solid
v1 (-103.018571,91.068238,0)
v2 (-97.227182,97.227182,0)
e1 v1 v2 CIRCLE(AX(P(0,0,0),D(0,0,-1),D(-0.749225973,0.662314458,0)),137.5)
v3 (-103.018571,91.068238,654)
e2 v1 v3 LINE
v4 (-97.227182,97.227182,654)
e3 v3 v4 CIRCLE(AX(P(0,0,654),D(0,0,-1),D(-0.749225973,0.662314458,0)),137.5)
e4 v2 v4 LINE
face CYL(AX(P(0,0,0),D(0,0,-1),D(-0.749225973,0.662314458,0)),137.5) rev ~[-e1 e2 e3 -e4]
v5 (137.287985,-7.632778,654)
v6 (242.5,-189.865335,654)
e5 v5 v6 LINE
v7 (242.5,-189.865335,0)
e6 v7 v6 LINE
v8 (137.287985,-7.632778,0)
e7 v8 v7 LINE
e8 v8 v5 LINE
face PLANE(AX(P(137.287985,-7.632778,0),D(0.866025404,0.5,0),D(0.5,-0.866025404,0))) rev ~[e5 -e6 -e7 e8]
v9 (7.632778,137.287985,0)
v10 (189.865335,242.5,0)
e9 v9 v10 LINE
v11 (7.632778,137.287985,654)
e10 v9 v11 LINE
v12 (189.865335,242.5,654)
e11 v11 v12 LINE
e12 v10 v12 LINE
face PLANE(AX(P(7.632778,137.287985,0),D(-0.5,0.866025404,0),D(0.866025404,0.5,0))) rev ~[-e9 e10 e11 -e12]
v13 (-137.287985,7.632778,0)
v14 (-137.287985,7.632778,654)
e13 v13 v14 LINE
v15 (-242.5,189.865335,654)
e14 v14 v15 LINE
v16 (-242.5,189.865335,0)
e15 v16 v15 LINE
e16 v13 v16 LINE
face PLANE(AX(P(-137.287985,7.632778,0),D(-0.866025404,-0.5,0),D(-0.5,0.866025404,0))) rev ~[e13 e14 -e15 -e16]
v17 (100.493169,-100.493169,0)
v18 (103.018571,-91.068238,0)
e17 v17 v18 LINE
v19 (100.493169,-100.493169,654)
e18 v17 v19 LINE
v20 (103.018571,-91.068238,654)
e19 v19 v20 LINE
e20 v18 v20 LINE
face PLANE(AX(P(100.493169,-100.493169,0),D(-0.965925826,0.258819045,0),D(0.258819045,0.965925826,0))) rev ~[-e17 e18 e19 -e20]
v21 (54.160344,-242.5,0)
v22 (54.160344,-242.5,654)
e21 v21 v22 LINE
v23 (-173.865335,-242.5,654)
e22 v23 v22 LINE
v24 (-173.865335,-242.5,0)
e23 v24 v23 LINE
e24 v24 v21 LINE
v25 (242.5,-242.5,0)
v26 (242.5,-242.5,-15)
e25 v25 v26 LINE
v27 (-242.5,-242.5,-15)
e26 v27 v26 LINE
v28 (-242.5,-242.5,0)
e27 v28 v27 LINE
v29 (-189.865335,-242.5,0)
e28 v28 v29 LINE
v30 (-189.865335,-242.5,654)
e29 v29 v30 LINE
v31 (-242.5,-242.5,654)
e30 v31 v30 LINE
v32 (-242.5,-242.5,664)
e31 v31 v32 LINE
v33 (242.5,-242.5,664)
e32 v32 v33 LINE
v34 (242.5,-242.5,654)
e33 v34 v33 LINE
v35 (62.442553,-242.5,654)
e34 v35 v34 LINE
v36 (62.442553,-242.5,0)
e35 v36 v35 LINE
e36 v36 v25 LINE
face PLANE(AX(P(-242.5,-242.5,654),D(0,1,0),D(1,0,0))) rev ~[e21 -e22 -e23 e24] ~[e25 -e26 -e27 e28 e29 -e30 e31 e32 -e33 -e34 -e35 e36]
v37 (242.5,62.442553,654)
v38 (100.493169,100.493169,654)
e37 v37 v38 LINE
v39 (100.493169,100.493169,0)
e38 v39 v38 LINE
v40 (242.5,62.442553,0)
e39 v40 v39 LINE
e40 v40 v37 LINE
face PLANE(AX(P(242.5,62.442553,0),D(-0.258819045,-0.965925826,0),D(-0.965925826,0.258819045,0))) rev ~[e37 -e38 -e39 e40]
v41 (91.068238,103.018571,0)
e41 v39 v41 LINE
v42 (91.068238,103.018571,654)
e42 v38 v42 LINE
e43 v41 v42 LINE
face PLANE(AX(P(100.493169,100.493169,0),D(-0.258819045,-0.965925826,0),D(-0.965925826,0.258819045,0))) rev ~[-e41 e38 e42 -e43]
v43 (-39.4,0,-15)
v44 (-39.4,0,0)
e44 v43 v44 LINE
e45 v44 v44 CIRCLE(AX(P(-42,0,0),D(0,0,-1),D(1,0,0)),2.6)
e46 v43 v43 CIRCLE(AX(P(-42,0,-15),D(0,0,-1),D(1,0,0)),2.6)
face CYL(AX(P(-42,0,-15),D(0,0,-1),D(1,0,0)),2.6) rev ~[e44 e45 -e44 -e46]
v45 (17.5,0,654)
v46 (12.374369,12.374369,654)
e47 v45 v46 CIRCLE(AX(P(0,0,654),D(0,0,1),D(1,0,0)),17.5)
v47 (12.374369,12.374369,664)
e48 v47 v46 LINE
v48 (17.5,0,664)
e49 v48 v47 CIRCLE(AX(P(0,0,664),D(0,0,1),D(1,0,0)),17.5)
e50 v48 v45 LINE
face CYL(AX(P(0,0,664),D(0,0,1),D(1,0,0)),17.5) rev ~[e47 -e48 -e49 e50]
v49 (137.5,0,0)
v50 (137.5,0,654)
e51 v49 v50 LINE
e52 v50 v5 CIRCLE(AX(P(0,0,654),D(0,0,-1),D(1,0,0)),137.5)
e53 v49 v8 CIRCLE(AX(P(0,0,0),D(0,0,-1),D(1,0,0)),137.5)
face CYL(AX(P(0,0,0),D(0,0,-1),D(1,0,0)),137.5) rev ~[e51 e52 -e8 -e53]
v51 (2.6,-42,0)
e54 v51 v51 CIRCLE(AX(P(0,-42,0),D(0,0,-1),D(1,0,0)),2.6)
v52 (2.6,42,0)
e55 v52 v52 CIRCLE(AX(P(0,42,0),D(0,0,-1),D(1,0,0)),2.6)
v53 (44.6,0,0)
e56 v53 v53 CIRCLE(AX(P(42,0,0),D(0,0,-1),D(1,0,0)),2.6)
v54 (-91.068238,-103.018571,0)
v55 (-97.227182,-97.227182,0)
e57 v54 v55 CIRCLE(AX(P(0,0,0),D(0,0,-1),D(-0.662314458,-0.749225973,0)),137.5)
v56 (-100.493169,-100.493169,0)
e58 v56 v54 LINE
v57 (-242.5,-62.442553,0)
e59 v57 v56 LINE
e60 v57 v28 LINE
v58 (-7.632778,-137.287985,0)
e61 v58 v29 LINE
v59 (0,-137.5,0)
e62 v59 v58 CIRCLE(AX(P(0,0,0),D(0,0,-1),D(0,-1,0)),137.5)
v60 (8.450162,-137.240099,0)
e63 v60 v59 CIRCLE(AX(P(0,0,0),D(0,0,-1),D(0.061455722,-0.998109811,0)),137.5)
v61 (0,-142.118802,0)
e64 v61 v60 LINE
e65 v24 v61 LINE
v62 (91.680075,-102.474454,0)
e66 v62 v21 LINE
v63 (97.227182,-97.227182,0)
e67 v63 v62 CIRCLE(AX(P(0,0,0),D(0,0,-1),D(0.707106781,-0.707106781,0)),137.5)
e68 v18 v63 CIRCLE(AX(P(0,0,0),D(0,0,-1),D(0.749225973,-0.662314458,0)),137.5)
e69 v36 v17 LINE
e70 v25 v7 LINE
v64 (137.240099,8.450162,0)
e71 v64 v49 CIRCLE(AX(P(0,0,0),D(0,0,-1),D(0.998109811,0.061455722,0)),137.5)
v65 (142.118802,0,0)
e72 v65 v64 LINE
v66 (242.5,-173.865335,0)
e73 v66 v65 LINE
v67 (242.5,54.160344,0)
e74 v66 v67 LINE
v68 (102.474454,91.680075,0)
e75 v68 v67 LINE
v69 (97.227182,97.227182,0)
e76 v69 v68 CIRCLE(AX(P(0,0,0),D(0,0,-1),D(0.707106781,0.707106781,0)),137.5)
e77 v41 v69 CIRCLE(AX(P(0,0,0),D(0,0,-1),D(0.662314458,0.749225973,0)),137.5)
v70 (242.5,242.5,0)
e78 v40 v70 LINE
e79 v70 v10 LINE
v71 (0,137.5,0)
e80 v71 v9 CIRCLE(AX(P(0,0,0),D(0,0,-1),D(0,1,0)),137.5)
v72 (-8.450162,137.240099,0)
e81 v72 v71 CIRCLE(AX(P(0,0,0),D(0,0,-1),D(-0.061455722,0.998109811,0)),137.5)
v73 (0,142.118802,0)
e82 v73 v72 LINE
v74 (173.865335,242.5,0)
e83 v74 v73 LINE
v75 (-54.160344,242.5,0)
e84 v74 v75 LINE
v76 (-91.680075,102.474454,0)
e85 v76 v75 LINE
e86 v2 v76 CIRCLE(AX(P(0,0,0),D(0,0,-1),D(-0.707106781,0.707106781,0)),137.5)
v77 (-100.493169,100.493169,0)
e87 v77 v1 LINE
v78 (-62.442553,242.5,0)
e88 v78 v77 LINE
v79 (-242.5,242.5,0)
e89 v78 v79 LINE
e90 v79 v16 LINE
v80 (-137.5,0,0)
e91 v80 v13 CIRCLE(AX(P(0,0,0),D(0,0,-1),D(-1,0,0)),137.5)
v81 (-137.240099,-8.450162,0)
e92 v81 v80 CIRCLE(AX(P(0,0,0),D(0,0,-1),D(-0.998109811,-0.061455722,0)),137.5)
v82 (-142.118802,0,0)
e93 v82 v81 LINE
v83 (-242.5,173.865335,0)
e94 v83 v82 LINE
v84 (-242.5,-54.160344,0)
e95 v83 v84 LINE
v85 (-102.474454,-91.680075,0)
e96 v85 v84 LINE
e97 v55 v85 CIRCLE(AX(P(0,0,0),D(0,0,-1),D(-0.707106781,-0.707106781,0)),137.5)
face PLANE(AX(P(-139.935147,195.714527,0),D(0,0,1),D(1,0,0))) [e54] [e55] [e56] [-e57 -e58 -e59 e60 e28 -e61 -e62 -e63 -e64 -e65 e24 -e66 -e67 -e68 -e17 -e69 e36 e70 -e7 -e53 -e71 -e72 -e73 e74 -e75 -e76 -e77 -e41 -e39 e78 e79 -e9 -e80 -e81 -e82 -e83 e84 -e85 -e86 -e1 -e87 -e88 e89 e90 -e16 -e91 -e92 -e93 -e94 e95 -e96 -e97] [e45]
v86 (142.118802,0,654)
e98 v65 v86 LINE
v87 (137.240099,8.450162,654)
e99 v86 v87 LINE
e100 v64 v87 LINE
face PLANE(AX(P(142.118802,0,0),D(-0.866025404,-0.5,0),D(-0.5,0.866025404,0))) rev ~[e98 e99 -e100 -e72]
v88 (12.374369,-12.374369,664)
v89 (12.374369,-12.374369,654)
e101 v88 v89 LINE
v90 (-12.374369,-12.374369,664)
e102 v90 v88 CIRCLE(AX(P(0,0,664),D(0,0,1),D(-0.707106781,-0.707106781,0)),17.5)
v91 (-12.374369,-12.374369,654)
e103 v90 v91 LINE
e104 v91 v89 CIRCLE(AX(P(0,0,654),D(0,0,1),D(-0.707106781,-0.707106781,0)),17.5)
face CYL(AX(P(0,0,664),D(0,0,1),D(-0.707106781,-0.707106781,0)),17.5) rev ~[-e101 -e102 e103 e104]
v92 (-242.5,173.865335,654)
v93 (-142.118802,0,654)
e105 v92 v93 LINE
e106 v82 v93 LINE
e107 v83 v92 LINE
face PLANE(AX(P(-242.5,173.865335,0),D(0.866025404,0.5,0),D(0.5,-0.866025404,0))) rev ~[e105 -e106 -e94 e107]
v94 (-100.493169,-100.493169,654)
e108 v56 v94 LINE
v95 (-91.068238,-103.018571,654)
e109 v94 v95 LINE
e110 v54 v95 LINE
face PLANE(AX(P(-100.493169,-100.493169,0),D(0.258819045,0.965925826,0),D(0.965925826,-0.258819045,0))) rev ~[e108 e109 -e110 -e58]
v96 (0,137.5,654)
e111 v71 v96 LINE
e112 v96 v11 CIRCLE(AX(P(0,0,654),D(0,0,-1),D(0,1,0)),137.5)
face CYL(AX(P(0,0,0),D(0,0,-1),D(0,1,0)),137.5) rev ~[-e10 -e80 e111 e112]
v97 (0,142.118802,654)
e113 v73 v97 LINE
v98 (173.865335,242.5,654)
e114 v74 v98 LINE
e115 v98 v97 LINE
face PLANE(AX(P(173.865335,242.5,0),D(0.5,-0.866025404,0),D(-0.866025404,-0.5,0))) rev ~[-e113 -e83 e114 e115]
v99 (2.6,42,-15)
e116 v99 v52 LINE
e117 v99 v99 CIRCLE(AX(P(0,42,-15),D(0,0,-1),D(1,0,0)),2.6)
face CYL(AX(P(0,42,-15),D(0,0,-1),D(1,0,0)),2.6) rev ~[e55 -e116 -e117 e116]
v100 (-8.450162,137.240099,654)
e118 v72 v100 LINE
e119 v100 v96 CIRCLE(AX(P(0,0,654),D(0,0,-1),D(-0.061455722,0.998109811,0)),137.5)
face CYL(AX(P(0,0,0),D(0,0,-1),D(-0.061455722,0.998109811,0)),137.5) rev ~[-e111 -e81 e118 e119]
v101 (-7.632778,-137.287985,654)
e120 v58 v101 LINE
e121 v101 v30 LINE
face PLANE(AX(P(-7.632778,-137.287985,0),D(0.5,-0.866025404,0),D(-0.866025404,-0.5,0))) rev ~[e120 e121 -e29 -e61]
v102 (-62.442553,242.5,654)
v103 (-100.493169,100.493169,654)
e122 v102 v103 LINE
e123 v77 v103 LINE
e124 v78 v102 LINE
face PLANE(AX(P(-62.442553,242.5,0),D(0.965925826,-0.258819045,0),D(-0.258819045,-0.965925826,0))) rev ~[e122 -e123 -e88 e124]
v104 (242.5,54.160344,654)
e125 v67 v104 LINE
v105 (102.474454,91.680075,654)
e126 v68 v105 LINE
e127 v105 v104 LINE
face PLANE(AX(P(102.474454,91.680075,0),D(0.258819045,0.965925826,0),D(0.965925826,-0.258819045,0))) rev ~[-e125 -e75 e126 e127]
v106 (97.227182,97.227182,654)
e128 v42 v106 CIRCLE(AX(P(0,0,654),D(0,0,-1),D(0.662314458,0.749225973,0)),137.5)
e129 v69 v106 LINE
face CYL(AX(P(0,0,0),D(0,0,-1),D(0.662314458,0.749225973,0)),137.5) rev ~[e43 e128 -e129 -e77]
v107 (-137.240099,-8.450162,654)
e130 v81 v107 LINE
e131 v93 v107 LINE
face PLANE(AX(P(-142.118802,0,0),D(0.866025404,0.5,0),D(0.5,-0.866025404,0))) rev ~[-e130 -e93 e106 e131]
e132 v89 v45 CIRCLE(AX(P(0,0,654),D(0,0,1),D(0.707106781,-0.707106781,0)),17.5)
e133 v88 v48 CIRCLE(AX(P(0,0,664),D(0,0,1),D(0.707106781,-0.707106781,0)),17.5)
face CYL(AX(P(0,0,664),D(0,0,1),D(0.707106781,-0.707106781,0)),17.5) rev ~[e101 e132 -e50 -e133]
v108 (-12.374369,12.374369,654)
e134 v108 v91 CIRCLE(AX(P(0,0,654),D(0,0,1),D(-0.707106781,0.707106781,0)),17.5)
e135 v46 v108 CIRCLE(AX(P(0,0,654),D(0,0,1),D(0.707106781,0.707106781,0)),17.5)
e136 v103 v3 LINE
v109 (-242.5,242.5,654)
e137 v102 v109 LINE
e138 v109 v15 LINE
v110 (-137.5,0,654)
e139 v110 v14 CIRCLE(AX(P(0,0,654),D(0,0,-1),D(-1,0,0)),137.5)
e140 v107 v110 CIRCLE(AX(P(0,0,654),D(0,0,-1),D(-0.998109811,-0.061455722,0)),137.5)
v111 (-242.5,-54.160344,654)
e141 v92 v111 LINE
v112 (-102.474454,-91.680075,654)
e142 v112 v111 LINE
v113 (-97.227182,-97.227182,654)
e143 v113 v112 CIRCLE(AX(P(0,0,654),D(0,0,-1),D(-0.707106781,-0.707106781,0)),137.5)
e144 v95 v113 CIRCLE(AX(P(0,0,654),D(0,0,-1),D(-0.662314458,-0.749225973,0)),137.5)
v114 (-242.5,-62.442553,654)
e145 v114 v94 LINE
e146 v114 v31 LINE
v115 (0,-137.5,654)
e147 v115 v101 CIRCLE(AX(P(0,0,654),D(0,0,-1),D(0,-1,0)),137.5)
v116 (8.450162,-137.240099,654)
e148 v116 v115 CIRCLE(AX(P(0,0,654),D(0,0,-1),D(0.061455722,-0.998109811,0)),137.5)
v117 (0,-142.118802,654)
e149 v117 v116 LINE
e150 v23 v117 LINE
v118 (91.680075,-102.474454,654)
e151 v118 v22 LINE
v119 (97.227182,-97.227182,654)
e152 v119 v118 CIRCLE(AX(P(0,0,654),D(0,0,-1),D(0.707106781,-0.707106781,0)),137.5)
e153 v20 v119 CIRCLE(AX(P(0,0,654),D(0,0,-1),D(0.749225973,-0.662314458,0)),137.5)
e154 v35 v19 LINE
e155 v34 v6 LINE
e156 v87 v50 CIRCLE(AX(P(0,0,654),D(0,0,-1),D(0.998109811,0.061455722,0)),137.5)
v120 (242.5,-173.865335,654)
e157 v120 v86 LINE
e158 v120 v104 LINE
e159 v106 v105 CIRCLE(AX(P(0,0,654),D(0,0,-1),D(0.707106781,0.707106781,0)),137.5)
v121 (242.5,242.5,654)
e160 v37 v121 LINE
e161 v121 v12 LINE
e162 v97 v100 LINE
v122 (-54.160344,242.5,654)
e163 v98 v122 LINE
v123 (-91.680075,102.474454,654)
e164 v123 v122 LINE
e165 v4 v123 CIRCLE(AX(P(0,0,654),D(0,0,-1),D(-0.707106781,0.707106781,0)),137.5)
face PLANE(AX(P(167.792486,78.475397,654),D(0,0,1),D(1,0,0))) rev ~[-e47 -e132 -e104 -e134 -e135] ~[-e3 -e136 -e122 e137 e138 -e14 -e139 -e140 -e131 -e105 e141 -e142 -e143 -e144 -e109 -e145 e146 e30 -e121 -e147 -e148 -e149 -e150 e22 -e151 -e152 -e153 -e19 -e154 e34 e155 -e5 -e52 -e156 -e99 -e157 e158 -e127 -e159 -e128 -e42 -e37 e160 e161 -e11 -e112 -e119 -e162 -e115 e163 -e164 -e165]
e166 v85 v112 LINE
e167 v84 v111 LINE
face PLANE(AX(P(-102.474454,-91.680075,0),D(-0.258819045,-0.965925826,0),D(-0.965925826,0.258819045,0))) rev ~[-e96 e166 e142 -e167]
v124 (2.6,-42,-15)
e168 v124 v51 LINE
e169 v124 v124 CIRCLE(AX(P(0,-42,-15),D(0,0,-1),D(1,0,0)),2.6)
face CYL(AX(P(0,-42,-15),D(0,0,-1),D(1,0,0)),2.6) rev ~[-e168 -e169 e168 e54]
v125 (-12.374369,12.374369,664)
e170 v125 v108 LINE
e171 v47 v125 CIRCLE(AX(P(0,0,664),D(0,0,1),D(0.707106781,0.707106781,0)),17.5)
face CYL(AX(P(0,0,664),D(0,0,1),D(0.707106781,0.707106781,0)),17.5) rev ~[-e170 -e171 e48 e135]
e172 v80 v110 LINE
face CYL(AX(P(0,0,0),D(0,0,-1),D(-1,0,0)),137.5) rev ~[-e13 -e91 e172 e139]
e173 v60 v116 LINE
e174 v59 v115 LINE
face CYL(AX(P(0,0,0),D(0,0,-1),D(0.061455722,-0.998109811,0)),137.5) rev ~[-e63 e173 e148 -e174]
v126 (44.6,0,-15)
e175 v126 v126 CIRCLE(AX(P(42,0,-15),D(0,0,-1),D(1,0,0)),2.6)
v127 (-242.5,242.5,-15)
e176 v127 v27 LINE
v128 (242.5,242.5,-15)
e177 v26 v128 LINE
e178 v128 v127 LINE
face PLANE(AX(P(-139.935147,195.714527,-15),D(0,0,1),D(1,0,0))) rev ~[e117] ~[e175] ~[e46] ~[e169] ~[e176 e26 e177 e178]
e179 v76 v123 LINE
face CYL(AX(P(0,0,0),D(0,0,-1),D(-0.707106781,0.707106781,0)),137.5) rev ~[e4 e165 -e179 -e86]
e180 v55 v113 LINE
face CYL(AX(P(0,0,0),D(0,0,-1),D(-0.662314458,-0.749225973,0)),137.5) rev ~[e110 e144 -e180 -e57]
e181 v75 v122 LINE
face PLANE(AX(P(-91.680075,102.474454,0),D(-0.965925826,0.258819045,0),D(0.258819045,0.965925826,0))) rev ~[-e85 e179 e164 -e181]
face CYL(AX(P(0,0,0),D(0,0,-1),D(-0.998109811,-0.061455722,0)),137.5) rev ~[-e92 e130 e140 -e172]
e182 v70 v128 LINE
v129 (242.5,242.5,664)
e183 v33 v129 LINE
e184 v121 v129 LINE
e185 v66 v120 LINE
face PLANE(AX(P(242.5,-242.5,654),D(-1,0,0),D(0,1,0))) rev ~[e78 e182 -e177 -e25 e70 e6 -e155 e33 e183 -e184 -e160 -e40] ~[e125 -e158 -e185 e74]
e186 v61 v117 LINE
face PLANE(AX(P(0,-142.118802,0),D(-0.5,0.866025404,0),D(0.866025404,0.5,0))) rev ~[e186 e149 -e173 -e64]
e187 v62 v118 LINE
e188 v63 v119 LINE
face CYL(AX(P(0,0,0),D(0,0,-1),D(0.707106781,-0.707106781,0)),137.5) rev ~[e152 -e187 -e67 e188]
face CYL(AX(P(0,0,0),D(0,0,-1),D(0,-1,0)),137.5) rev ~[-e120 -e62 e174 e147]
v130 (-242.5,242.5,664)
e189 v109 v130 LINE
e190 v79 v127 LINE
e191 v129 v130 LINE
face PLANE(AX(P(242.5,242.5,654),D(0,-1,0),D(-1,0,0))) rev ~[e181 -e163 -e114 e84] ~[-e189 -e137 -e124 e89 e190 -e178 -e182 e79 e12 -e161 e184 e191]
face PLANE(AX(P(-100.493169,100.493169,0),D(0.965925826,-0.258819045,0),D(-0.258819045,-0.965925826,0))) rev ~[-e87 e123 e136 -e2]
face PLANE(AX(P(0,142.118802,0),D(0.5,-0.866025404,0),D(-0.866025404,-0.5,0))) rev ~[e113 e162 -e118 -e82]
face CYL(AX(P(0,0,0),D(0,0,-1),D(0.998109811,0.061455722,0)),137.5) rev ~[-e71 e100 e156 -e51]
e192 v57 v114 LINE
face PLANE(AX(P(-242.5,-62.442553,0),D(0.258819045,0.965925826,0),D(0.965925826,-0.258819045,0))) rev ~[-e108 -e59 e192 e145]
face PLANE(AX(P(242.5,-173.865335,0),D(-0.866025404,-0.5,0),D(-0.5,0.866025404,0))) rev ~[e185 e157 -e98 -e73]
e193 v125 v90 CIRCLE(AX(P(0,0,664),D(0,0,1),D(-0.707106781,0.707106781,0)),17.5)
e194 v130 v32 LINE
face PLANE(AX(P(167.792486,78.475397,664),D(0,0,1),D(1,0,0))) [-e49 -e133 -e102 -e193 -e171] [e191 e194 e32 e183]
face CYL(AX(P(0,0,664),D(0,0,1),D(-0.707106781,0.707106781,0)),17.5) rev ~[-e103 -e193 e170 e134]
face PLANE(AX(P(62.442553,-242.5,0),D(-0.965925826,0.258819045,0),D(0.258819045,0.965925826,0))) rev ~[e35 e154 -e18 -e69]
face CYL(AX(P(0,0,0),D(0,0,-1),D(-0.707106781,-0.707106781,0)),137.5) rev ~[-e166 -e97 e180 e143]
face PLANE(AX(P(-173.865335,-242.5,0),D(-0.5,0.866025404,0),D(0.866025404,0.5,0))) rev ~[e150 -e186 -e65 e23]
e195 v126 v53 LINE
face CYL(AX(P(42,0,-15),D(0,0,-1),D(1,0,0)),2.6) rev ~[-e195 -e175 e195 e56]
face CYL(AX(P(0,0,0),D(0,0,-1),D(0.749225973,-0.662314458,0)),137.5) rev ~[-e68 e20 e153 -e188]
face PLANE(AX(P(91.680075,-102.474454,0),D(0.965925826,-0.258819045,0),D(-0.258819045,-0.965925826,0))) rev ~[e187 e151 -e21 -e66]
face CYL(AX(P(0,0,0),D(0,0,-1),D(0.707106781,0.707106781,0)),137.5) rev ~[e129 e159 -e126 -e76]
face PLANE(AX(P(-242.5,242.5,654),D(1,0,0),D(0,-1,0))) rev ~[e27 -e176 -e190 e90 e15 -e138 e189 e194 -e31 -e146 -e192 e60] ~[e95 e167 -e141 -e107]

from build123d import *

# Parameters (mm, degrees)
F1_DEPTH = 15
F2_DEPTH = 654
F4_DEPTH = 10
F6_DEPTH = 10
F7_R     = 2.6
F8_DEPTH = 15


with BuildPart() as f1:
    # F0 (on Top) → F1 (new body)
    with BuildSketch(Plane.XY):
        Polygon((-242.5, 242.5), (-100.4931687369, 100.4931687369), (-62.4425529802, 242.5), align=None)
        with BuildLine():
            Line((-242.5, 189.8653347947), (-137.2879845203, 7.6327784171))
            ThreePointArc((-137.2879845203, 7.6327784171), (-127.1895403437, 52.2405094458), (-103.0185713345, 91.0682379329))
            Line((-103.0185713345, 91.0682379329), (-100.4931687369, 100.4931687369))
            Line((-100.4931687369, 100.4931687369), (-242.5, 242.5))
            Line((-242.5, 242.5), (-242.5, 189.8653347947))
        make_face()
        with BuildLine():
            ThreePointArc((95.4594154602, 95.4594154602), (124.723736889, 51.6622633693), (135, 0))
            Line((135, 0), (137.5, 0))
            ThreePointArc((137.5, 0), (137.4350093838, 4.2270788599), (137.2400989718, 8.4501617857))
            ThreePointArc((137.2400989718, 8.4501617857), (126.8762049548, 52.9969679913), (102.4744542077, 91.6800754517))
            ThreePointArc((102.4744542077, 91.6800754517), (99.8893313431, 94.4900602382), (97.2271824132, 97.2271824132))
            Line((97.2271824132, 97.2271824132), (95.4594154602, 95.4594154602))
        make_face()
        with BuildLine():
            Line((0, -135), (0, 0))
            Line((0, 0), (-95.4594154602, -95.4594154602))
            ThreePointArc((-95.4594154602, -95.4594154602), (-51.6622633693, -124.723736889), (0, -135))
        make_face()
        with BuildLine():
            Line((54.1603435369, -242.5), (91.6800754517, -102.4744542077))
            ThreePointArc((91.6800754517, -102.4744542077), (52.9969679913, -126.8762049548), (8.4501617857, -137.2400989718))
            Line((8.4501617857, -137.2400989718), (0, -142.1188021535))
            Line((0, -142.1188021535), (0, -242.5))
            Line((0, -242.5), (54.1603435369, -242.5))
        make_face()
        Polygon((242.5, -242.5), (100.4931687369, -100.4931687369), (62.4425529802, -242.5), align=None)
        Polygon((0, -242.5), (0, -142.1188021535), (-173.8653347947, -242.5), align=None)
        with BuildLine():
            ThreePointArc((0, -135), (51.6622633693, -124.723736889), (95.4594154602, -95.4594154602))
            Line((95.4594154602, -95.4594154602), (0, 0))
            Line((0, 0), (0, -135))
        make_face()
        with BuildLine():
            ThreePointArc((95.4594154602, -95.4594154602), (124.723736889, -51.6622633693), (135, 0))
            Line((135, 0), (0, 0))
            Line((0, 0), (95.4594154602, -95.4594154602))
        make_face()
        with BuildLine():
            Line((97.2271824132, -97.2271824132), (95.4594154602, -95.4594154602))
            ThreePointArc((95.4594154602, -95.4594154602), (51.6622633693, -124.723736889), (0, -135))
            Line((0, -135), (0, -137.5))
            ThreePointArc((0, -137.5), (4.2270788599, -137.4350093838), (8.4501617857, -137.2400989718))
            ThreePointArc((8.4501617857, -137.2400989718), (52.9969679913, -126.8762049548), (91.6800754517, -102.4744542077))
            ThreePointArc((91.6800754517, -102.4744542077), (94.4900602382, -99.8893313431), (97.2271824132, -97.2271824132))
        make_face()
        with BuildLine():
            ThreePointArc((-95.4594154602, 95.4594154602), (-51.6622633693, 124.723736889), (0, 135))
            Line((0, 135), (0, 137.5))
            ThreePointArc((0, 137.5), (-4.2270788599, 137.4350093838), (-8.4501617857, 137.2400989718))
            ThreePointArc((-8.4501617857, 137.2400989718), (-52.9969679913, 126.8762049548), (-91.6800754517, 102.4744542077))
            ThreePointArc((-91.6800754517, 102.4744542077), (-94.4900602382, 99.8893313431), (-97.2271824132, 97.2271824132))
            Line((-97.2271824132, 97.2271824132), (-95.4594154602, 95.4594154602))
        make_face()
        with BuildLine():
            Line((242.5, -189.8653347947), (137.2879845203, -7.6327784171))
            ThreePointArc((137.2879845203, -7.6327784171), (127.1895403437, -52.2405094458), (103.0185713345, -91.0682379329))
            Line((103.0185713345, -91.0682379329), (100.4931687369, -100.4931687369))
            Line((100.4931687369, -100.4931687369), (242.5, -242.5))
            Line((242.5, -242.5), (242.5, -189.8653347947))
        make_face()
        with BuildLine():
            Line((137.5, 0), (135, 0))
            ThreePointArc((135, 0), (124.723736889, -51.6622633693), (95.4594154602, -95.4594154602))
            Line((95.4594154602, -95.4594154602), (97.2271824132, -97.2271824132))
            ThreePointArc((97.2271824132, -97.2271824132), (100.1702232341, -94.1922309813), (103.0185713345, -91.0682379329))
            ThreePointArc((103.0185713345, -91.0682379329), (127.1895403437, -52.2405094458), (137.2879845203, -7.6327784171))
            ThreePointArc((137.2879845203, -7.6327784171), (137.4469859101, -3.8178612117), (137.5, 0))
        make_face()
        with BuildLine():
            Line((-95.4594154602, -95.4594154602), (0, 0))
            Line((0, 0), (-135, 0))
            ThreePointArc((-135, 0), (-124.723736889, -51.6622633693), (-95.4594154602, -95.4594154602))
        make_face()
        with BuildLine():
            Line((-135, 0), (0, 0))
            Line((0, 0), (-95.4594154602, 95.4594154602))
            ThreePointArc((-95.4594154602, 95.4594154602), (-124.723736889, 51.6622633693), (-135, 0))
        make_face()
        with BuildLine():
            ThreePointArc((0, 135), (51.6622633693, 124.723736889), (95.4594154602, 95.4594154602))
            Line((95.4594154602, 95.4594154602), (97.2271824132, 97.2271824132))
            ThreePointArc((97.2271824132, 97.2271824132), (94.1922309813, 100.1702232341), (91.0682379329, 103.0185713345))
            ThreePointArc((91.0682379329, 103.0185713345), (52.2405094458, 127.1895403437), (7.6327784171, 137.2879845203))
            ThreePointArc((7.6327784171, 137.2879845203), (3.8178612117, 137.4469859101), (0, 137.5))
            Line((0, 137.5), (0, 135))
        make_face()
        with BuildLine():
            ThreePointArc((-102.4744542077, -91.6800754517), (-126.8762049548, -52.9969679913), (-137.2400989718, -8.4501617857))
            Line((-137.2400989718, -8.4501617857), (-142.1188021535, 0))
            Line((-142.1188021535, 0), (-242.5, 0))
            Line((-242.5, 0), (-242.5, -54.1603435369))
            Line((-242.5, -54.1603435369), (-102.4744542077, -91.6800754517))
        make_face()
        with BuildLine():
            Line((0, -137.5), (0, -135))
            ThreePointArc((0, -135), (-51.6622633693, -124.723736889), (-95.4594154602, -95.4594154602))
            Line((-95.4594154602, -95.4594154602), (-97.2271824132, -97.2271824132))
            ThreePointArc((-97.2271824132, -97.2271824132), (-94.1922309813, -100.1702232341), (-91.0682379329, -103.0185713345))
            ThreePointArc((-91.0682379329, -103.0185713345), (-52.2405094458, -127.1895403437), (-7.6327784171, -137.2879845203))
            ThreePointArc((-7.6327784171, -137.2879845203), (-3.8178612117, -137.4469859101), (0, -137.5))
        make_face()
        with BuildLine():
            Line((-95.4594154602, 95.4594154602), (0, 0))
            Line((0, 0), (0, 135))
            ThreePointArc((0, 135), (-51.6622633693, 124.723736889), (-95.4594154602, 95.4594154602))
        make_face()
        with BuildLine():
            Line((0, 0), (135, 0))
            ThreePointArc((135, 0), (124.723736889, 51.6622633693), (95.4594154602, 95.4594154602))
            Line((95.4594154602, 95.4594154602), (0, 0))
        make_face()
        with BuildLine():
            Line((0, 0), (95.4594154602, 95.4594154602))
            ThreePointArc((95.4594154602, 95.4594154602), (51.6622633693, 124.723736889), (0, 135))
            Line((0, 135), (0, 0))
        make_face()
        Polygon((-242.5, 0), (-142.1188021535, 0), (-242.5, 173.8653347947), align=None)
        Polygon((-242.5, -242.5), (-100.4931687369, -100.4931687369), (-242.5, -62.4425529802), align=None)
        Polygon((242.5, 0), (142.1188021535, 0), (242.5, -173.8653347947), align=None)
        with BuildLine():
            ThreePointArc((-95.4594154602, -95.4594154602), (-124.723736889, -51.6622633693), (-135, 0))
            Line((-135, 0), (-137.5, 0))
            ThreePointArc((-137.5, 0), (-137.4350093838, -4.2270788599), (-137.2400989718, -8.4501617857))
            ThreePointArc((-137.2400989718, -8.4501617857), (-126.8762049548, -52.9969679913), (-102.4744542077, -91.6800754517))
            ThreePointArc((-102.4744542077, -91.6800754517), (-99.8893313431, -94.4900602382), (-97.2271824132, -97.2271824132))
            Line((-97.2271824132, -97.2271824132), (-95.4594154602, -95.4594154602))
        make_face()
        with BuildLine():
            ThreePointArc((102.4744542077, 91.6800754517), (126.8762049548, 52.9969679913), (137.2400989718, 8.4501617857))
            Line((137.2400989718, 8.4501617857), (142.1188021535, 0))
            Line((142.1188021535, 0), (242.5, 0))
            Line((242.5, 0), (242.5, 54.1603435369))
            Line((242.5, 54.1603435369), (102.4744542077, 91.6800754517))
        make_face()
        with BuildLine():
            Line((-189.8653347947, -242.5), (-7.6327784171, -137.2879845203))
            ThreePointArc((-7.6327784171, -137.2879845203), (-52.2405094458, -127.1895403437), (-91.0682379329, -103.0185713345))
            Line((-91.0682379329, -103.0185713345), (-100.4931687369, -100.4931687369))
            Line((-100.4931687369, -100.4931687369), (-242.5, -242.5))
            Line((-242.5, -242.5), (-189.8653347947, -242.5))
        make_face()
        with BuildLine():
            Line((-137.5, 0), (-135, 0))
            ThreePointArc((-135, 0), (-124.723736889, 51.6622633693), (-95.4594154602, 95.4594154602))
            Line((-95.4594154602, 95.4594154602), (-97.2271824132, 97.2271824132))
            ThreePointArc((-97.2271824132, 97.2271824132), (-100.1702232341, 94.1922309813), (-103.0185713345, 91.0682379329))
            ThreePointArc((-103.0185713345, 91.0682379329), (-127.1895403437, 52.2405094458), (-137.2879845203, 7.6327784171))
            ThreePointArc((-137.2879845203, 7.6327784171), (-137.4469859101, 3.8178612117), (-137.5, 0))
        make_face()
        with BuildLine():
            ThreePointArc((-91.0682379329, -103.0185713345), (-94.1922309813, -100.1702232341), (-97.2271824132, -97.2271824132))
            Line((-97.2271824132, -97.2271824132), (-100.4931687369, -100.4931687369))
            Line((-100.4931687369, -100.4931687369), (-91.0682379329, -103.0185713345))
        make_face()
        with BuildLine():
            ThreePointArc((137.2400989718, 8.4501617857), (137.4350093838, 4.2270788599), (137.5, 0))
            Line((137.5, 0), (142.1188021535, 0))
            Line((142.1188021535, 0), (137.2400989718, 8.4501617857))
        make_face()
        Polygon((0, -142.1188021535), (0, -137.5), (-181.8653347947, -242.5), (-173.8653347947, -242.5), align=None)
        with BuildLine():
            Line((242.5, -181.8653347947), (137.5, 0))
            ThreePointArc((137.5, 0), (137.4469859101, -3.8178612117), (137.2879845203, -7.6327784171))
            Line((137.2879845203, -7.6327784171), (242.5, -189.8653347947))
            Line((242.5, -189.8653347947), (242.5, -181.8653347947))
        make_face()
        Polygon((100.4931687369, -100.4931687369), (97.2271824132, -97.2271824132), (58.3014482586, -242.5), (62.4425529802, -242.5), align=None)
        with BuildLine():
            Line((-58.3014482586, 242.5), (-97.2271824132, 97.2271824132))
            ThreePointArc((-97.2271824132, 97.2271824132), (-94.4900602382, 99.8893313431), (-91.6800754517, 102.4744542077))
            Line((-91.6800754517, 102.4744542077), (-54.1603435369, 242.5))
            Line((-54.1603435369, 242.5), (-58.3014482586, 242.5))
        make_face()
        with BuildLine():
            ThreePointArc((8.4501617857, -137.2400989718), (4.2270788599, -137.4350093838), (0, -137.5))
            Line((0, -137.5), (0, -142.1188021535))
            Line((0, -142.1188021535), (8.4501617857, -137.2400989718))
        make_face()
        with BuildLine():
            ThreePointArc((-8.4501617857, 137.2400989718), (-4.2270788599, 137.4350093838), (0, 137.5))
            Line((0, 137.5), (0, 142.1188021535))
            Line((0, 142.1188021535), (-8.4501617857, 137.2400989718))
        make_face()
        Polygon((-100.4931687369, -100.4931687369), (-97.2271824132, -97.2271824132), (-242.5, -58.3014482586), (-242.5, -62.4425529802), align=None)
        with BuildLine():
            Line((58.3014482586, -242.5), (97.2271824132, -97.2271824131))
            ThreePointArc((97.2271824132, -97.2271824132), (94.4900602382, -99.8893313431), (91.6800754517, -102.4744542077))
            Line((91.6800754517, -102.4744542077), (54.1603435369, -242.5))
            Line((54.1603435369, -242.5), (58.3014482586, -242.5))
        make_face()
        Polygon((-142.1188021535, 0), (-137.5, 0), (-242.5, 181.8653347947), (-242.5, 173.8653347947), align=None)
        Polygon((-100.4931687369, 100.4931687369), (-97.2271824132, 97.2271824132), (-58.3014482586, 242.5), (-62.4425529802, 242.5), align=None)
        Polygon((100.4931687369, 100.4931687369), (97.2271824132, 97.2271824132), (242.5, 58.3014482586), (242.5, 62.4425529802), align=None)
        with BuildLine():
            Line((-242.5, -58.3014482586), (-97.2271824132, -97.2271824132))
            ThreePointArc((-97.2271824132, -97.2271824132), (-99.8893313431, -94.4900602382), (-102.4744542077, -91.6800754517))
            Line((-102.4744542077, -91.6800754517), (-242.5, -54.1603435369))
            Line((-242.5, -54.1603435369), (-242.5, -58.3014482586))
        make_face()
        with BuildLine():
            Line((242.5, 58.3014482586), (97.2271824132, 97.2271824132))
            ThreePointArc((97.2271824132, 97.2271824132), (99.8893313431, 94.4900602382), (102.4744542077, 91.6800754517))
            Line((102.4744542077, 91.6800754517), (242.5, 54.1603435369))
            Line((242.5, 54.1603435369), (242.5, 58.3014482586))
        make_face()
        with BuildLine():
            Line((-242.5, 181.8653347947), (-137.5, 0))
            ThreePointArc((-137.5, 0), (-137.4469859101, 3.8178612117), (-137.2879845203, 7.6327784171))
            Line((-137.2879845203, 7.6327784171), (-242.5, 189.8653347947))
            Line((-242.5, 189.8653347947), (-242.5, 181.8653347947))
        make_face()
        with BuildLine():
            ThreePointArc((-103.0185713345, 91.0682379329), (-100.1702232341, 94.1922309813), (-97.2271824132, 97.2271824132))
            Line((-97.2271824132, 97.2271824132), (-100.4931687369, 100.4931687369))
            Line((-100.4931687369, 100.4931687369), (-103.0185713345, 91.0682379329))
        make_face()
        Polygon((142.1188021535, 0), (137.5, 0), (242.5, -181.8653347947), (242.5, -173.8653347947), align=None)
        with BuildLine():
            Line((-181.8653347947, -242.5), (0, -137.5))
            ThreePointArc((0, -137.5), (-3.8178612117, -137.4469859101), (-7.6327784171, -137.2879845203))
            Line((-7.6327784171, -137.2879845203), (-189.8653347947, -242.5))
            Line((-189.8653347947, -242.5), (-181.8653347947, -242.5))
        make_face()
        with BuildLine():
            ThreePointArc((91.0682379329, 103.0185713345), (94.1922309813, 100.1702232341), (97.2271824132, 97.2271824132))
            Line((97.2271824132, 97.2271824132), (100.4931687369, 100.4931687369))
            Line((100.4931687369, 100.4931687369), (91.0682379329, 103.0185713345))
        make_face()
        with BuildLine():
            ThreePointArc((103.0185713345, -91.0682379329), (100.1702232341, -94.1922309813), (97.2271824132, -97.2271824132))
            Line((97.2271824132, -97.2271824132), (100.4931687369, -100.4931687369))
            Line((100.4931687369, -100.4931687369), (103.0185713345, -91.0682379329))
        make_face()
        with BuildLine():
            ThreePointArc((-137.2400989718, -8.4501617857), (-137.4350093838, -4.2270788599), (-137.5, 0))
            Line((-137.5, 0), (-142.1188021535, 0))
            Line((-142.1188021535, 0), (-137.2400989718, -8.4501617857))
        make_face()
        with BuildLine():
            ThreePointArc((-91.6800754517, 102.4744542077), (-52.9969679913, 126.8762049548), (-8.4501617857, 137.2400989718))
            Line((-8.4501617857, 137.2400989718), (0, 142.1188021535))
            Line((0, 142.1188021535), (0, 242.5))
            Line((0, 242.5), (-54.1603435369, 242.5))
            Line((-54.1603435369, 242.5), (-91.6800754517, 102.4744542077))
        make_face()
        Polygon((242.5, 242.5), (100.4931687369, 100.4931687369), (242.5, 62.4425529802), align=None)
        Polygon((0, 242.5), (0, 142.1188021535), (173.8653347947, 242.5), align=None)
        with BuildLine():
            ThreePointArc((7.6327784171, 137.2879845203), (52.2405094458, 127.1895403437), (91.0682379329, 103.0185713345))
            Line((91.0682379329, 103.0185713345), (100.4931687369, 100.4931687369))
            Line((100.4931687369, 100.4931687369), (242.5, 242.5))
            Line((242.5, 242.5), (189.8653347947, 242.5))
            Line((189.8653347947, 242.5), (7.6327784171, 137.2879845203))
        make_face()
        Polygon((0, 142.1188021535), (0, 137.5), (181.8653347947, 242.5), (173.8653347947, 242.5), align=None)
        with BuildLine():
            Line((181.8653347947, 242.5), (0, 137.5))
            ThreePointArc((0, 137.5), (3.8178612117, 137.4469859101), (7.6327784171, 137.2879845203))
            Line((7.6327784171, 137.2879845203), (189.8653347947, 242.5))
            Line((189.8653347947, 242.5), (181.8653347947, 242.5))
        make_face()
    extrude(amount=-F1_DEPTH)

    # F0 (on Top) → F2 (join)
    with BuildSketch(Plane.XY):
        Polygon((-100.4931687369, 100.4931687369), (-97.2271824132, 97.2271824132), (-58.3014482586, 242.5), (-62.4425529802, 242.5), align=None)
        with BuildLine():
            Line((-58.3014482586, 242.5), (-97.2271824132, 97.2271824132))
            ThreePointArc((-97.2271824132, 97.2271824132), (-94.4900602382, 99.8893313431), (-91.6800754517, 102.4744542077))
            Line((-91.6800754517, 102.4744542077), (-54.1603435369, 242.5))
            Line((-54.1603435369, 242.5), (-58.3014482586, 242.5))
        make_face()
        with BuildLine():
            ThreePointArc((-103.0185713345, 91.0682379329), (-100.1702232341, 94.1922309813), (-97.2271824132, 97.2271824132))
            Line((-97.2271824132, 97.2271824132), (-100.4931687369, 100.4931687369))
            Line((-100.4931687369, 100.4931687369), (-103.0185713345, 91.0682379329))
        make_face()
        Polygon((0, 142.1188021535), (0, 137.5), (181.8653347947, 242.5), (173.8653347947, 242.5), align=None)
        with BuildLine():
            Line((181.8653347947, 242.5), (0, 137.5))
            ThreePointArc((0, 137.5), (3.8178612117, 137.4469859101), (7.6327784171, 137.2879845203))
            Line((7.6327784171, 137.2879845203), (189.8653347947, 242.5))
            Line((189.8653347947, 242.5), (181.8653347947, 242.5))
        make_face()
        with BuildLine():
            ThreePointArc((-8.4501617857, 137.2400989718), (-4.2270788599, 137.4350093838), (0, 137.5))
            Line((0, 137.5), (0, 142.1188021535))
            Line((0, 142.1188021535), (-8.4501617857, 137.2400989718))
        make_face()
        with BuildLine():
            Line((242.5, 58.3014482586), (97.2271824132, 97.2271824132))
            ThreePointArc((97.2271824132, 97.2271824132), (99.8893313431, 94.4900602382), (102.4744542077, 91.6800754517))
            Line((102.4744542077, 91.6800754517), (242.5, 54.1603435369))
            Line((242.5, 54.1603435369), (242.5, 58.3014482586))
        make_face()
        Polygon((100.4931687369, 100.4931687369), (97.2271824132, 97.2271824132), (242.5, 58.3014482586), (242.5, 62.4425529802), align=None)
        with BuildLine():
            ThreePointArc((91.0682379329, 103.0185713345), (94.1922309813, 100.1702232341), (97.2271824132, 97.2271824132))
            Line((97.2271824132, 97.2271824132), (100.4931687369, 100.4931687369))
            Line((100.4931687369, 100.4931687369), (91.0682379329, 103.0185713345))
        make_face()
        with BuildLine():
            ThreePointArc((137.2400989718, 8.4501617857), (137.4350093838, 4.2270788599), (137.5, 0))
            Line((137.5, 0), (142.1188021535, 0))
            Line((142.1188021535, 0), (137.2400989718, 8.4501617857))
        make_face()
        Polygon((142.1188021535, 0), (137.5, 0), (242.5, -181.8653347947), (242.5, -173.8653347947), align=None)
        with BuildLine():
            Line((242.5, -181.8653347947), (137.5, 0))
            ThreePointArc((137.5, 0), (137.4469859101, -3.8178612117), (137.2879845203, -7.6327784171))
            Line((137.2879845203, -7.6327784171), (242.5, -189.8653347947))
            Line((242.5, -189.8653347947), (242.5, -181.8653347947))
        make_face()
        with BuildLine():
            Line((58.3014482586, -242.5), (97.2271824132, -97.2271824131))
            ThreePointArc((97.2271824132, -97.2271824132), (94.4900602382, -99.8893313431), (91.6800754517, -102.4744542077))
            Line((91.6800754517, -102.4744542077), (54.1603435369, -242.5))
            Line((54.1603435369, -242.5), (58.3014482586, -242.5))
        make_face()
        Polygon((100.4931687369, -100.4931687369), (97.2271824132, -97.2271824132), (58.3014482586, -242.5), (62.4425529802, -242.5), align=None)
        with BuildLine():
            ThreePointArc((103.0185713345, -91.0682379329), (100.1702232341, -94.1922309813), (97.2271824132, -97.2271824132))
            Line((97.2271824132, -97.2271824132), (100.4931687369, -100.4931687369))
            Line((100.4931687369, -100.4931687369), (103.0185713345, -91.0682379329))
        make_face()
        with BuildLine():
            Line((-181.8653347947, -242.5), (0, -137.5))
            ThreePointArc((0, -137.5), (-3.8178612117, -137.4469859101), (-7.6327784171, -137.2879845203))
            Line((-7.6327784171, -137.2879845203), (-189.8653347947, -242.5))
            Line((-189.8653347947, -242.5), (-181.8653347947, -242.5))
        make_face()
        Polygon((0, -142.1188021535), (0, -137.5), (-181.8653347947, -242.5), (-173.8653347947, -242.5), align=None)
        with BuildLine():
            ThreePointArc((8.4501617857, -137.2400989718), (4.2270788599, -137.4350093838), (0, -137.5))
            Line((0, -137.5), (0, -142.1188021535))
            Line((0, -142.1188021535), (8.4501617857, -137.2400989718))
        make_face()
        with BuildLine():
            ThreePointArc((-91.0682379329, -103.0185713345), (-94.1922309813, -100.1702232341), (-97.2271824132, -97.2271824132))
            Line((-97.2271824132, -97.2271824132), (-100.4931687369, -100.4931687369))
            Line((-100.4931687369, -100.4931687369), (-91.0682379329, -103.0185713345))
        make_face()
        Polygon((-100.4931687369, -100.4931687369), (-97.2271824132, -97.2271824132), (-242.5, -58.3014482586), (-242.5, -62.4425529802), align=None)
        with BuildLine():
            Line((-242.5, -58.3014482586), (-97.2271824132, -97.2271824132))
            ThreePointArc((-97.2271824132, -97.2271824132), (-99.8893313431, -94.4900602382), (-102.4744542077, -91.6800754517))
            Line((-102.4744542077, -91.6800754517), (-242.5, -54.1603435369))
            Line((-242.5, -54.1603435369), (-242.5, -58.3014482586))
        make_face()
        with BuildLine():
            Line((-242.5, 181.8653347947), (-137.5, 0))
            ThreePointArc((-137.5, 0), (-137.4469859101, 3.8178612117), (-137.2879845203, 7.6327784171))
            Line((-137.2879845203, 7.6327784171), (-242.5, 189.8653347947))
            Line((-242.5, 189.8653347947), (-242.5, 181.8653347947))
        make_face()
        Polygon((-142.1188021535, 0), (-137.5, 0), (-242.5, 181.8653347947), (-242.5, 173.8653347947), align=None)
        with BuildLine():
            ThreePointArc((-137.2400989718, -8.4501617857), (-137.4350093838, -4.2270788599), (-137.5, 0))
            Line((-137.5, 0), (-142.1188021535, 0))
            Line((-142.1188021535, 0), (-137.2400989718, -8.4501617857))
        make_face()
    extrude(amount=F2_DEPTH)

    # F3 (on face) → F4 (join)
    with BuildSketch(Plane.XY.offset(654)):
        with BuildLine():
            Line((102.4744542077, 91.6800754517), (242.5, 54.1603435369))
            Line((242.5, 54.1603435369), (242.5, 62.4425529802))
            Line((242.5, 62.4425529802), (91.0682379329, 103.0185713345))
            ThreePointArc((91.0682379329, 103.0185713345), (96.9372673046, 97.5162356099), (102.4744542077, 91.6800754517))
        make_face()
        with BuildLine():
            Line((-242.5, -242.5), (242.5, -242.5))
            Line((242.5, -242.5), (242.5, 54.1603435369))
            Line((242.5, 54.1603435369), (102.4744542077, 91.6800754517))
            ThreePointArc((102.4744542077, 91.6800754517), (96.9372673046, 97.5162356099), (91.0682379329, 103.0185713345))
            Line((91.0682379329, 103.0185713345), (242.5, 62.4425529802))
            Line((242.5, 62.4425529802), (242.5, 242.5))
            Line((242.5, 242.5), (-242.5, 242.5))
            Line((-242.5, 242.5), (-242.5, -242.5))
        make_face()
    extrude(amount=F4_DEPTH)

    # F5 (on face) → F6 (cut, through all)
    with BuildSketch(Plane.XY.offset(664)):
        with BuildLine():
            Line((0, 0), (-12.3743686708, 12.3743686708))
            ThreePointArc((-12.3743686708, 12.3743686708), (-17.5, 0), (-12.3743686708, -12.3743686708))
            Line((-12.3743686708, -12.3743686708), (0, 0))
        make_face()
        with BuildLine():
            Line((0, 0), (12.3743686708, 12.3743686708))
            ThreePointArc((12.3743686708, 12.3743686708), (0, 17.5), (-12.3743686708, 12.3743686708))
            Line((-12.3743686708, 12.3743686708), (0, 0))
        make_face()
        with BuildLine():
            ThreePointArc((12.3743686708, -12.3743686708), (16.1678918189, -6.6969600664), (17.5, 0))
            ThreePointArc((17.5, 0), (16.1678918189, 6.6969600664), (12.3743686708, 12.3743686708))
            Line((12.3743686708, 12.3743686708), (0, 0))
            Line((0, 0), (12.3743686708, -12.3743686708))
        make_face()
        with BuildLine():
            ThreePointArc((-12.3743686708, -12.3743686708), (0, -17.5), (12.3743686708, -12.3743686708))
            Line((12.3743686708, -12.3743686708), (0, 0))
            Line((0, 0), (-12.3743686708, -12.3743686708))
        make_face()
    extrude(amount=-F6_DEPTH, mode=Mode.SUBTRACT)

    # F7 (on face) → F8 (cut, through all)
    with BuildSketch(Plane(origin=(0, 0, -15), x_dir=(1, 0, 0), z_dir=(0, 0, -1))):
        with Locations((-42, 0)):
            Circle(F7_R)
        with Locations((0, 42)):
            Circle(F7_R)
        with Locations((42, 0)):
            Circle(F7_R)
        with Locations((0, -42)):
            Circle(F7_R)
    extrude(amount=-F8_DEPTH, mode=Mode.SUBTRACT)


solid = f1.part
